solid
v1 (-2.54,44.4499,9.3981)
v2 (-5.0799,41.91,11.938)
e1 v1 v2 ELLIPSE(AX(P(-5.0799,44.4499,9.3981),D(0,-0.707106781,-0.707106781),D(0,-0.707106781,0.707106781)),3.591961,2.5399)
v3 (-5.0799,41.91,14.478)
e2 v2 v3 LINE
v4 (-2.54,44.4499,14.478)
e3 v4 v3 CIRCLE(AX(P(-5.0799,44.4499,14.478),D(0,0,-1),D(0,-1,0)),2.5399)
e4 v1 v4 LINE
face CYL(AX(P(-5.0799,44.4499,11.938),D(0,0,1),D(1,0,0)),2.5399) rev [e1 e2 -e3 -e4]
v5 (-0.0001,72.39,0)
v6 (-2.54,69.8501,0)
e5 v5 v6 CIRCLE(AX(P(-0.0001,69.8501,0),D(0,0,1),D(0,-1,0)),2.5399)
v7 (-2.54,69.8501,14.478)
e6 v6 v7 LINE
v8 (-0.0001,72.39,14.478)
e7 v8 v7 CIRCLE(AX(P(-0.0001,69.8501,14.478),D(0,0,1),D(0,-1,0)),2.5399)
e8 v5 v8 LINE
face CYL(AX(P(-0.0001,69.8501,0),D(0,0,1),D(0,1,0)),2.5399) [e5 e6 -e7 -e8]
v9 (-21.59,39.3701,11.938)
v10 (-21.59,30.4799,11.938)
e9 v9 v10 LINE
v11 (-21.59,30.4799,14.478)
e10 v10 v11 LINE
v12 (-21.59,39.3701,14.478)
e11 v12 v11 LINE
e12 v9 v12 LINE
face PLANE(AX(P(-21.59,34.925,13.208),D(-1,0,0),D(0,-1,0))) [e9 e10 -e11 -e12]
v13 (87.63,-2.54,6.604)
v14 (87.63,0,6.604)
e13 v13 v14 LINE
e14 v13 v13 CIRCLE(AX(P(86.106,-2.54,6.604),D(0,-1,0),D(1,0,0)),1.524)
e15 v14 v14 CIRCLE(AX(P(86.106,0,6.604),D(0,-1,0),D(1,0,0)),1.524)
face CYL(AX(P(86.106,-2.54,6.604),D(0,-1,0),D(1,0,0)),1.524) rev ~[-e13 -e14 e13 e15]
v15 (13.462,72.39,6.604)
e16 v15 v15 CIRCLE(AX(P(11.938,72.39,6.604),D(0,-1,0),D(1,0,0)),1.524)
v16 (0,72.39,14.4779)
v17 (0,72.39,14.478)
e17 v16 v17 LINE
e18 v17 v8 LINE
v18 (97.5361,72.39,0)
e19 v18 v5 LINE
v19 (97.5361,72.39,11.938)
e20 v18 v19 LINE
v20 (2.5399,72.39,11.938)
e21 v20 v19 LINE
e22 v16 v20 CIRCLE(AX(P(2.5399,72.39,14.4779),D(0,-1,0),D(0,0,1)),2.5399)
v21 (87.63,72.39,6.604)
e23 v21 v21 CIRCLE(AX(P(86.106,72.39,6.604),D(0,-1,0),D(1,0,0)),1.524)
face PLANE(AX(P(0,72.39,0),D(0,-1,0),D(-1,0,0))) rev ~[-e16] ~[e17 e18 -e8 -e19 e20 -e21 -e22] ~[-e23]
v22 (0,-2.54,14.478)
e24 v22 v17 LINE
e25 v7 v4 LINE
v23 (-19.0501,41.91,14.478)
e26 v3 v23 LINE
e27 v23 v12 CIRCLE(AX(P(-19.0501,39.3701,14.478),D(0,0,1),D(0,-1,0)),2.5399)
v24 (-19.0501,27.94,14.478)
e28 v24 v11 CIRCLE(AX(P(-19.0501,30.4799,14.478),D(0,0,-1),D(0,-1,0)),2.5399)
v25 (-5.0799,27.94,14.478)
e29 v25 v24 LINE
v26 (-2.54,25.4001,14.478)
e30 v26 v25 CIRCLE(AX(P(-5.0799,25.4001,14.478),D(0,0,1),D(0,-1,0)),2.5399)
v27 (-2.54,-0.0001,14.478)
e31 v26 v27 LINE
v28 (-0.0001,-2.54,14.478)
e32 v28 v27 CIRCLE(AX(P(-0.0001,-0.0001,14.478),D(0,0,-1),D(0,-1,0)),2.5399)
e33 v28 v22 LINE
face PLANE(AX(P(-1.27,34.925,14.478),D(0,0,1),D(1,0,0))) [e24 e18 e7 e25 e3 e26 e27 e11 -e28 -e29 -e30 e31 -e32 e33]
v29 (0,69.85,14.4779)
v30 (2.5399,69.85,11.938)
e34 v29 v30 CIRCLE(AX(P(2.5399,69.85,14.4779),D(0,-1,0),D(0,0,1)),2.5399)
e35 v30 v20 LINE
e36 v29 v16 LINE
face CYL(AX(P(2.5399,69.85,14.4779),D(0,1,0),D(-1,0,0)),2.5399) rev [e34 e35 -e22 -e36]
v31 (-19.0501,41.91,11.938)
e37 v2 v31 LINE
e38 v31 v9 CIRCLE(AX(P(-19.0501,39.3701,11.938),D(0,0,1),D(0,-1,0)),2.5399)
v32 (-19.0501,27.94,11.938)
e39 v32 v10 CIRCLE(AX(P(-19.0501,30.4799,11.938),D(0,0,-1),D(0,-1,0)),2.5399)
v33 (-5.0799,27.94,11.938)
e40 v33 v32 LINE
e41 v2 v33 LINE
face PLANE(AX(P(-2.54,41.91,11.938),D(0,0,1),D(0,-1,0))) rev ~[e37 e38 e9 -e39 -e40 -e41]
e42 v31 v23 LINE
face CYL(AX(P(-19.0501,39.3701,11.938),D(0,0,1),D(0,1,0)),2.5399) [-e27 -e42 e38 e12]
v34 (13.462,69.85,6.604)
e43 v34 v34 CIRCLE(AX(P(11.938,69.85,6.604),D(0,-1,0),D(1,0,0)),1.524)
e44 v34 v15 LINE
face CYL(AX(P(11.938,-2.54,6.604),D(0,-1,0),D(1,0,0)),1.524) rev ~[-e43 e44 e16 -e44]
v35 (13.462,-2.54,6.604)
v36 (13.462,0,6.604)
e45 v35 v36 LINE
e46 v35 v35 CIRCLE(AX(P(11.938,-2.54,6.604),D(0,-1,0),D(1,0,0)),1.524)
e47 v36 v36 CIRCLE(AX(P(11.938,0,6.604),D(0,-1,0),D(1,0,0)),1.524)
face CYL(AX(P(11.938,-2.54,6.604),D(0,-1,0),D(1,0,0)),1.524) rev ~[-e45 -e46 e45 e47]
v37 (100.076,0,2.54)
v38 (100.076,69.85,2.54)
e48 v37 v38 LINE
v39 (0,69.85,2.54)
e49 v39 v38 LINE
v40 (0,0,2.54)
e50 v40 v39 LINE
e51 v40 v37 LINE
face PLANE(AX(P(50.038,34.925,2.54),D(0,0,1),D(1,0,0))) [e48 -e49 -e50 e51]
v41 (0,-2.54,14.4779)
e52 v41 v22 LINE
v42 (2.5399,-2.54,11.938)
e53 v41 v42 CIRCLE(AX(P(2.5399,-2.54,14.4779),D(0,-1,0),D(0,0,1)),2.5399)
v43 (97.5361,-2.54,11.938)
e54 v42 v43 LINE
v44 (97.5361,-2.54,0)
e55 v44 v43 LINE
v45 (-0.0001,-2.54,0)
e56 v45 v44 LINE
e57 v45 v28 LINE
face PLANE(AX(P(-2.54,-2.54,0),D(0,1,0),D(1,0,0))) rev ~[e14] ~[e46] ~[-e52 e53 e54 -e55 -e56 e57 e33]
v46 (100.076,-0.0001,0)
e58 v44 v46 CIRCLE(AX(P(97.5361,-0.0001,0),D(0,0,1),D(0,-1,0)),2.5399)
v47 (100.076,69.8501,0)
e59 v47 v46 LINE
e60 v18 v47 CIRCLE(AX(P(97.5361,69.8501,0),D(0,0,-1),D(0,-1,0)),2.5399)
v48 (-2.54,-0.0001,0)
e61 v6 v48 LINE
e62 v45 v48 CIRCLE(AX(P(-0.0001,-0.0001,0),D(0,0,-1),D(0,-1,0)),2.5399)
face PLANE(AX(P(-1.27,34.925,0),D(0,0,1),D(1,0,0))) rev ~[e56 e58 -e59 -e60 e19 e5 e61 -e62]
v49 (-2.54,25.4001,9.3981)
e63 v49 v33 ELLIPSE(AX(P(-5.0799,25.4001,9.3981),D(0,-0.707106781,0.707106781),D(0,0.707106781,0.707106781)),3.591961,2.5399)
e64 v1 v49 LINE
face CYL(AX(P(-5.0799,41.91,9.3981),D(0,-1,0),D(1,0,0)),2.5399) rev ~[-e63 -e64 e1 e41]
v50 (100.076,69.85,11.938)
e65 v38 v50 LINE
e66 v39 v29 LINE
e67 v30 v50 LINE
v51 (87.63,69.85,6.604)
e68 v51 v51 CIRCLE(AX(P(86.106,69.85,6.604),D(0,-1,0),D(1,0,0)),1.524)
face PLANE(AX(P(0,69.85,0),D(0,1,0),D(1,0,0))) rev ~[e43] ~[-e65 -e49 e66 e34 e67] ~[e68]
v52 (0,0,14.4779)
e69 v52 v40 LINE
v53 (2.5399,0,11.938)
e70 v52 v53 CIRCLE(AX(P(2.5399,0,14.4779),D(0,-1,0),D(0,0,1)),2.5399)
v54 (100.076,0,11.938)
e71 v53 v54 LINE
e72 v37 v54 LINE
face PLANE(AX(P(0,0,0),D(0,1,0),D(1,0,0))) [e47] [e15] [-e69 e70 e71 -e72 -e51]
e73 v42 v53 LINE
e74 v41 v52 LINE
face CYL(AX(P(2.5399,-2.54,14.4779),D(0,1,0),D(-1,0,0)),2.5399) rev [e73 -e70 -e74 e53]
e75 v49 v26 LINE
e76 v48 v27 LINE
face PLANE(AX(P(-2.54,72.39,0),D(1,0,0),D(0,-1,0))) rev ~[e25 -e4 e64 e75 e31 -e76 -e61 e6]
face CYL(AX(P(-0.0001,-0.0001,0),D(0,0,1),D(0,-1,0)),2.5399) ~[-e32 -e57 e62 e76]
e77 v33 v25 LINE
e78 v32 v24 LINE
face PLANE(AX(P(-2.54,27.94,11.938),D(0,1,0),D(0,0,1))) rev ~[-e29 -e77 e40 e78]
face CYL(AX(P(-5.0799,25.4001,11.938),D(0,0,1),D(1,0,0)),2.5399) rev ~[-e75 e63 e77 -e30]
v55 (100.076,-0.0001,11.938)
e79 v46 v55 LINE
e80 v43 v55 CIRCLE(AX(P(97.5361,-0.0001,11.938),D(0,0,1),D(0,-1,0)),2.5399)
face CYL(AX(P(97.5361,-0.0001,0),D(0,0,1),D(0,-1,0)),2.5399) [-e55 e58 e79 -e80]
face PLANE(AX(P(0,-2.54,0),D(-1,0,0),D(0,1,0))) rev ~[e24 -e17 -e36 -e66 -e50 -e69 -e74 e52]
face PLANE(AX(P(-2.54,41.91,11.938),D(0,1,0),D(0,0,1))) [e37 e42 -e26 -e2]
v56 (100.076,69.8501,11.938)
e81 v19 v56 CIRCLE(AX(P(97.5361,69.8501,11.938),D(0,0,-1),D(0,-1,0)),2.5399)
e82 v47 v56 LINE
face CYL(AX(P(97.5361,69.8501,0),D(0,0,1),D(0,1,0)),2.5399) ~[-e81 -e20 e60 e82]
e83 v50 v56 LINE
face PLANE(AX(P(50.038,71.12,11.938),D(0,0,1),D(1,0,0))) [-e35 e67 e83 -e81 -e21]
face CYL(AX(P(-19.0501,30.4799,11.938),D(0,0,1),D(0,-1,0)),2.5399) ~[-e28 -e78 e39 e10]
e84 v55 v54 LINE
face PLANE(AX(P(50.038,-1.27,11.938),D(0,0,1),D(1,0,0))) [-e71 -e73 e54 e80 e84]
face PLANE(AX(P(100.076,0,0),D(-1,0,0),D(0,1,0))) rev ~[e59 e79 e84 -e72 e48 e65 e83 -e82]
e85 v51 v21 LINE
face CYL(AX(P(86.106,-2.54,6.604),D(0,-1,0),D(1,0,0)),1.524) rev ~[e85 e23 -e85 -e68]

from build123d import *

# Parameters (mm, degrees)
F0_W     = 100.076
F0_H     = 2.54
F1_DEPTH = 11.938
F0_H_2   = 69.85
F2_DEPTH = 2.54
F4_DEPTH = 14.478
F5_W     = 13.97
F5_H     = 2.54
F6_DEPTH = 19.05
F7_R     = 2.5399
F3_R     = 1.524
F8_DEPTH = 76.2


# Not quite as in the source:
# - a fillet or chamfer is up to 0.001 mm smaller than in the source, because OpenCascade refuses the exact size


with BuildPart() as f1:
    # F0 (on Top) → F1 (new body)
    with BuildSketch(Plane.XY):
        with Locations((50.038, 71.12)):
            Rectangle(F0_W, F0_H)
    extrude(amount=F1_DEPTH)



with BuildPart() as f1b:
    # F0 (on Top) → F1, piece 2 (new body)
    with BuildSketch(Plane.XY):
        with Locations((50.038, -1.27)):
            Rectangle(F0_W, F0_H)
    extrude(amount=F1_DEPTH)


with BuildPart() as f1_1:
    add(f1.part)

    add(f1b.part)  # F2 merges F1b
    # F0 (on Top) → F2 (join)
    with BuildSketch(Plane.XY):
        with Locations((50.038, 34.925)):
            Rectangle(F0_W, F0_H_2)
    extrude(amount=F2_DEPTH)

    # F0 (on Top) → F4 (join)
    with BuildSketch(Plane.XY):
        Polygon((0, -2.54), (0, 0), (0, 69.85), (0, 72.39), (-2.54, 72.39), (-2.54, -2.54), align=None)
    extrude(amount=F4_DEPTH)

    # F5 (on face) → F6 (join)
    with BuildSketch(Plane(origin=(-2.54, 0, 0), x_dir=(0, -1, 0), z_dir=(-1, 0, 0))):
        with Locations((-34.925, 13.208)):
            Rectangle(F5_W, F5_H)
    extrude(amount=F6_DEPTH)

    # F7 (radius 2.54 in the source; OpenCascade refuses exactly that, so slightly less here)
    f7_edges = [f1_1.edges().sort_by_distance(p)[0] for p in [
        (-21.59, 27.94, 13.208),
        (-21.59, 41.91, 13.208),
        (-2.54, 41.91, 13.208),
        (-2.54, 27.94, 13.208),
        (-2.54, -2.54, 7.239),
        (100.076, -2.54, 5.969),
        (100.076, 72.39, 5.969),
        (-2.54, 72.39, 7.239),
        (0, 71.12, 11.938),
        (0, -1.27, 11.938),
        (-2.54, 34.925, 11.938),
    ]]
    fillet(f7_edges, radius=F7_R)

    # F3 (on face) → F8 (cut)
    with BuildSketch(Plane.XZ.offset(2.54)):
        with Locations((86.106, 6.604)):
            Circle(F3_R)
        with Locations((11.938, 6.604)):
            Circle(F3_R)
    extrude(amount=-F8_DEPTH, mode=Mode.SUBTRACT)


solid = f1_1.part
